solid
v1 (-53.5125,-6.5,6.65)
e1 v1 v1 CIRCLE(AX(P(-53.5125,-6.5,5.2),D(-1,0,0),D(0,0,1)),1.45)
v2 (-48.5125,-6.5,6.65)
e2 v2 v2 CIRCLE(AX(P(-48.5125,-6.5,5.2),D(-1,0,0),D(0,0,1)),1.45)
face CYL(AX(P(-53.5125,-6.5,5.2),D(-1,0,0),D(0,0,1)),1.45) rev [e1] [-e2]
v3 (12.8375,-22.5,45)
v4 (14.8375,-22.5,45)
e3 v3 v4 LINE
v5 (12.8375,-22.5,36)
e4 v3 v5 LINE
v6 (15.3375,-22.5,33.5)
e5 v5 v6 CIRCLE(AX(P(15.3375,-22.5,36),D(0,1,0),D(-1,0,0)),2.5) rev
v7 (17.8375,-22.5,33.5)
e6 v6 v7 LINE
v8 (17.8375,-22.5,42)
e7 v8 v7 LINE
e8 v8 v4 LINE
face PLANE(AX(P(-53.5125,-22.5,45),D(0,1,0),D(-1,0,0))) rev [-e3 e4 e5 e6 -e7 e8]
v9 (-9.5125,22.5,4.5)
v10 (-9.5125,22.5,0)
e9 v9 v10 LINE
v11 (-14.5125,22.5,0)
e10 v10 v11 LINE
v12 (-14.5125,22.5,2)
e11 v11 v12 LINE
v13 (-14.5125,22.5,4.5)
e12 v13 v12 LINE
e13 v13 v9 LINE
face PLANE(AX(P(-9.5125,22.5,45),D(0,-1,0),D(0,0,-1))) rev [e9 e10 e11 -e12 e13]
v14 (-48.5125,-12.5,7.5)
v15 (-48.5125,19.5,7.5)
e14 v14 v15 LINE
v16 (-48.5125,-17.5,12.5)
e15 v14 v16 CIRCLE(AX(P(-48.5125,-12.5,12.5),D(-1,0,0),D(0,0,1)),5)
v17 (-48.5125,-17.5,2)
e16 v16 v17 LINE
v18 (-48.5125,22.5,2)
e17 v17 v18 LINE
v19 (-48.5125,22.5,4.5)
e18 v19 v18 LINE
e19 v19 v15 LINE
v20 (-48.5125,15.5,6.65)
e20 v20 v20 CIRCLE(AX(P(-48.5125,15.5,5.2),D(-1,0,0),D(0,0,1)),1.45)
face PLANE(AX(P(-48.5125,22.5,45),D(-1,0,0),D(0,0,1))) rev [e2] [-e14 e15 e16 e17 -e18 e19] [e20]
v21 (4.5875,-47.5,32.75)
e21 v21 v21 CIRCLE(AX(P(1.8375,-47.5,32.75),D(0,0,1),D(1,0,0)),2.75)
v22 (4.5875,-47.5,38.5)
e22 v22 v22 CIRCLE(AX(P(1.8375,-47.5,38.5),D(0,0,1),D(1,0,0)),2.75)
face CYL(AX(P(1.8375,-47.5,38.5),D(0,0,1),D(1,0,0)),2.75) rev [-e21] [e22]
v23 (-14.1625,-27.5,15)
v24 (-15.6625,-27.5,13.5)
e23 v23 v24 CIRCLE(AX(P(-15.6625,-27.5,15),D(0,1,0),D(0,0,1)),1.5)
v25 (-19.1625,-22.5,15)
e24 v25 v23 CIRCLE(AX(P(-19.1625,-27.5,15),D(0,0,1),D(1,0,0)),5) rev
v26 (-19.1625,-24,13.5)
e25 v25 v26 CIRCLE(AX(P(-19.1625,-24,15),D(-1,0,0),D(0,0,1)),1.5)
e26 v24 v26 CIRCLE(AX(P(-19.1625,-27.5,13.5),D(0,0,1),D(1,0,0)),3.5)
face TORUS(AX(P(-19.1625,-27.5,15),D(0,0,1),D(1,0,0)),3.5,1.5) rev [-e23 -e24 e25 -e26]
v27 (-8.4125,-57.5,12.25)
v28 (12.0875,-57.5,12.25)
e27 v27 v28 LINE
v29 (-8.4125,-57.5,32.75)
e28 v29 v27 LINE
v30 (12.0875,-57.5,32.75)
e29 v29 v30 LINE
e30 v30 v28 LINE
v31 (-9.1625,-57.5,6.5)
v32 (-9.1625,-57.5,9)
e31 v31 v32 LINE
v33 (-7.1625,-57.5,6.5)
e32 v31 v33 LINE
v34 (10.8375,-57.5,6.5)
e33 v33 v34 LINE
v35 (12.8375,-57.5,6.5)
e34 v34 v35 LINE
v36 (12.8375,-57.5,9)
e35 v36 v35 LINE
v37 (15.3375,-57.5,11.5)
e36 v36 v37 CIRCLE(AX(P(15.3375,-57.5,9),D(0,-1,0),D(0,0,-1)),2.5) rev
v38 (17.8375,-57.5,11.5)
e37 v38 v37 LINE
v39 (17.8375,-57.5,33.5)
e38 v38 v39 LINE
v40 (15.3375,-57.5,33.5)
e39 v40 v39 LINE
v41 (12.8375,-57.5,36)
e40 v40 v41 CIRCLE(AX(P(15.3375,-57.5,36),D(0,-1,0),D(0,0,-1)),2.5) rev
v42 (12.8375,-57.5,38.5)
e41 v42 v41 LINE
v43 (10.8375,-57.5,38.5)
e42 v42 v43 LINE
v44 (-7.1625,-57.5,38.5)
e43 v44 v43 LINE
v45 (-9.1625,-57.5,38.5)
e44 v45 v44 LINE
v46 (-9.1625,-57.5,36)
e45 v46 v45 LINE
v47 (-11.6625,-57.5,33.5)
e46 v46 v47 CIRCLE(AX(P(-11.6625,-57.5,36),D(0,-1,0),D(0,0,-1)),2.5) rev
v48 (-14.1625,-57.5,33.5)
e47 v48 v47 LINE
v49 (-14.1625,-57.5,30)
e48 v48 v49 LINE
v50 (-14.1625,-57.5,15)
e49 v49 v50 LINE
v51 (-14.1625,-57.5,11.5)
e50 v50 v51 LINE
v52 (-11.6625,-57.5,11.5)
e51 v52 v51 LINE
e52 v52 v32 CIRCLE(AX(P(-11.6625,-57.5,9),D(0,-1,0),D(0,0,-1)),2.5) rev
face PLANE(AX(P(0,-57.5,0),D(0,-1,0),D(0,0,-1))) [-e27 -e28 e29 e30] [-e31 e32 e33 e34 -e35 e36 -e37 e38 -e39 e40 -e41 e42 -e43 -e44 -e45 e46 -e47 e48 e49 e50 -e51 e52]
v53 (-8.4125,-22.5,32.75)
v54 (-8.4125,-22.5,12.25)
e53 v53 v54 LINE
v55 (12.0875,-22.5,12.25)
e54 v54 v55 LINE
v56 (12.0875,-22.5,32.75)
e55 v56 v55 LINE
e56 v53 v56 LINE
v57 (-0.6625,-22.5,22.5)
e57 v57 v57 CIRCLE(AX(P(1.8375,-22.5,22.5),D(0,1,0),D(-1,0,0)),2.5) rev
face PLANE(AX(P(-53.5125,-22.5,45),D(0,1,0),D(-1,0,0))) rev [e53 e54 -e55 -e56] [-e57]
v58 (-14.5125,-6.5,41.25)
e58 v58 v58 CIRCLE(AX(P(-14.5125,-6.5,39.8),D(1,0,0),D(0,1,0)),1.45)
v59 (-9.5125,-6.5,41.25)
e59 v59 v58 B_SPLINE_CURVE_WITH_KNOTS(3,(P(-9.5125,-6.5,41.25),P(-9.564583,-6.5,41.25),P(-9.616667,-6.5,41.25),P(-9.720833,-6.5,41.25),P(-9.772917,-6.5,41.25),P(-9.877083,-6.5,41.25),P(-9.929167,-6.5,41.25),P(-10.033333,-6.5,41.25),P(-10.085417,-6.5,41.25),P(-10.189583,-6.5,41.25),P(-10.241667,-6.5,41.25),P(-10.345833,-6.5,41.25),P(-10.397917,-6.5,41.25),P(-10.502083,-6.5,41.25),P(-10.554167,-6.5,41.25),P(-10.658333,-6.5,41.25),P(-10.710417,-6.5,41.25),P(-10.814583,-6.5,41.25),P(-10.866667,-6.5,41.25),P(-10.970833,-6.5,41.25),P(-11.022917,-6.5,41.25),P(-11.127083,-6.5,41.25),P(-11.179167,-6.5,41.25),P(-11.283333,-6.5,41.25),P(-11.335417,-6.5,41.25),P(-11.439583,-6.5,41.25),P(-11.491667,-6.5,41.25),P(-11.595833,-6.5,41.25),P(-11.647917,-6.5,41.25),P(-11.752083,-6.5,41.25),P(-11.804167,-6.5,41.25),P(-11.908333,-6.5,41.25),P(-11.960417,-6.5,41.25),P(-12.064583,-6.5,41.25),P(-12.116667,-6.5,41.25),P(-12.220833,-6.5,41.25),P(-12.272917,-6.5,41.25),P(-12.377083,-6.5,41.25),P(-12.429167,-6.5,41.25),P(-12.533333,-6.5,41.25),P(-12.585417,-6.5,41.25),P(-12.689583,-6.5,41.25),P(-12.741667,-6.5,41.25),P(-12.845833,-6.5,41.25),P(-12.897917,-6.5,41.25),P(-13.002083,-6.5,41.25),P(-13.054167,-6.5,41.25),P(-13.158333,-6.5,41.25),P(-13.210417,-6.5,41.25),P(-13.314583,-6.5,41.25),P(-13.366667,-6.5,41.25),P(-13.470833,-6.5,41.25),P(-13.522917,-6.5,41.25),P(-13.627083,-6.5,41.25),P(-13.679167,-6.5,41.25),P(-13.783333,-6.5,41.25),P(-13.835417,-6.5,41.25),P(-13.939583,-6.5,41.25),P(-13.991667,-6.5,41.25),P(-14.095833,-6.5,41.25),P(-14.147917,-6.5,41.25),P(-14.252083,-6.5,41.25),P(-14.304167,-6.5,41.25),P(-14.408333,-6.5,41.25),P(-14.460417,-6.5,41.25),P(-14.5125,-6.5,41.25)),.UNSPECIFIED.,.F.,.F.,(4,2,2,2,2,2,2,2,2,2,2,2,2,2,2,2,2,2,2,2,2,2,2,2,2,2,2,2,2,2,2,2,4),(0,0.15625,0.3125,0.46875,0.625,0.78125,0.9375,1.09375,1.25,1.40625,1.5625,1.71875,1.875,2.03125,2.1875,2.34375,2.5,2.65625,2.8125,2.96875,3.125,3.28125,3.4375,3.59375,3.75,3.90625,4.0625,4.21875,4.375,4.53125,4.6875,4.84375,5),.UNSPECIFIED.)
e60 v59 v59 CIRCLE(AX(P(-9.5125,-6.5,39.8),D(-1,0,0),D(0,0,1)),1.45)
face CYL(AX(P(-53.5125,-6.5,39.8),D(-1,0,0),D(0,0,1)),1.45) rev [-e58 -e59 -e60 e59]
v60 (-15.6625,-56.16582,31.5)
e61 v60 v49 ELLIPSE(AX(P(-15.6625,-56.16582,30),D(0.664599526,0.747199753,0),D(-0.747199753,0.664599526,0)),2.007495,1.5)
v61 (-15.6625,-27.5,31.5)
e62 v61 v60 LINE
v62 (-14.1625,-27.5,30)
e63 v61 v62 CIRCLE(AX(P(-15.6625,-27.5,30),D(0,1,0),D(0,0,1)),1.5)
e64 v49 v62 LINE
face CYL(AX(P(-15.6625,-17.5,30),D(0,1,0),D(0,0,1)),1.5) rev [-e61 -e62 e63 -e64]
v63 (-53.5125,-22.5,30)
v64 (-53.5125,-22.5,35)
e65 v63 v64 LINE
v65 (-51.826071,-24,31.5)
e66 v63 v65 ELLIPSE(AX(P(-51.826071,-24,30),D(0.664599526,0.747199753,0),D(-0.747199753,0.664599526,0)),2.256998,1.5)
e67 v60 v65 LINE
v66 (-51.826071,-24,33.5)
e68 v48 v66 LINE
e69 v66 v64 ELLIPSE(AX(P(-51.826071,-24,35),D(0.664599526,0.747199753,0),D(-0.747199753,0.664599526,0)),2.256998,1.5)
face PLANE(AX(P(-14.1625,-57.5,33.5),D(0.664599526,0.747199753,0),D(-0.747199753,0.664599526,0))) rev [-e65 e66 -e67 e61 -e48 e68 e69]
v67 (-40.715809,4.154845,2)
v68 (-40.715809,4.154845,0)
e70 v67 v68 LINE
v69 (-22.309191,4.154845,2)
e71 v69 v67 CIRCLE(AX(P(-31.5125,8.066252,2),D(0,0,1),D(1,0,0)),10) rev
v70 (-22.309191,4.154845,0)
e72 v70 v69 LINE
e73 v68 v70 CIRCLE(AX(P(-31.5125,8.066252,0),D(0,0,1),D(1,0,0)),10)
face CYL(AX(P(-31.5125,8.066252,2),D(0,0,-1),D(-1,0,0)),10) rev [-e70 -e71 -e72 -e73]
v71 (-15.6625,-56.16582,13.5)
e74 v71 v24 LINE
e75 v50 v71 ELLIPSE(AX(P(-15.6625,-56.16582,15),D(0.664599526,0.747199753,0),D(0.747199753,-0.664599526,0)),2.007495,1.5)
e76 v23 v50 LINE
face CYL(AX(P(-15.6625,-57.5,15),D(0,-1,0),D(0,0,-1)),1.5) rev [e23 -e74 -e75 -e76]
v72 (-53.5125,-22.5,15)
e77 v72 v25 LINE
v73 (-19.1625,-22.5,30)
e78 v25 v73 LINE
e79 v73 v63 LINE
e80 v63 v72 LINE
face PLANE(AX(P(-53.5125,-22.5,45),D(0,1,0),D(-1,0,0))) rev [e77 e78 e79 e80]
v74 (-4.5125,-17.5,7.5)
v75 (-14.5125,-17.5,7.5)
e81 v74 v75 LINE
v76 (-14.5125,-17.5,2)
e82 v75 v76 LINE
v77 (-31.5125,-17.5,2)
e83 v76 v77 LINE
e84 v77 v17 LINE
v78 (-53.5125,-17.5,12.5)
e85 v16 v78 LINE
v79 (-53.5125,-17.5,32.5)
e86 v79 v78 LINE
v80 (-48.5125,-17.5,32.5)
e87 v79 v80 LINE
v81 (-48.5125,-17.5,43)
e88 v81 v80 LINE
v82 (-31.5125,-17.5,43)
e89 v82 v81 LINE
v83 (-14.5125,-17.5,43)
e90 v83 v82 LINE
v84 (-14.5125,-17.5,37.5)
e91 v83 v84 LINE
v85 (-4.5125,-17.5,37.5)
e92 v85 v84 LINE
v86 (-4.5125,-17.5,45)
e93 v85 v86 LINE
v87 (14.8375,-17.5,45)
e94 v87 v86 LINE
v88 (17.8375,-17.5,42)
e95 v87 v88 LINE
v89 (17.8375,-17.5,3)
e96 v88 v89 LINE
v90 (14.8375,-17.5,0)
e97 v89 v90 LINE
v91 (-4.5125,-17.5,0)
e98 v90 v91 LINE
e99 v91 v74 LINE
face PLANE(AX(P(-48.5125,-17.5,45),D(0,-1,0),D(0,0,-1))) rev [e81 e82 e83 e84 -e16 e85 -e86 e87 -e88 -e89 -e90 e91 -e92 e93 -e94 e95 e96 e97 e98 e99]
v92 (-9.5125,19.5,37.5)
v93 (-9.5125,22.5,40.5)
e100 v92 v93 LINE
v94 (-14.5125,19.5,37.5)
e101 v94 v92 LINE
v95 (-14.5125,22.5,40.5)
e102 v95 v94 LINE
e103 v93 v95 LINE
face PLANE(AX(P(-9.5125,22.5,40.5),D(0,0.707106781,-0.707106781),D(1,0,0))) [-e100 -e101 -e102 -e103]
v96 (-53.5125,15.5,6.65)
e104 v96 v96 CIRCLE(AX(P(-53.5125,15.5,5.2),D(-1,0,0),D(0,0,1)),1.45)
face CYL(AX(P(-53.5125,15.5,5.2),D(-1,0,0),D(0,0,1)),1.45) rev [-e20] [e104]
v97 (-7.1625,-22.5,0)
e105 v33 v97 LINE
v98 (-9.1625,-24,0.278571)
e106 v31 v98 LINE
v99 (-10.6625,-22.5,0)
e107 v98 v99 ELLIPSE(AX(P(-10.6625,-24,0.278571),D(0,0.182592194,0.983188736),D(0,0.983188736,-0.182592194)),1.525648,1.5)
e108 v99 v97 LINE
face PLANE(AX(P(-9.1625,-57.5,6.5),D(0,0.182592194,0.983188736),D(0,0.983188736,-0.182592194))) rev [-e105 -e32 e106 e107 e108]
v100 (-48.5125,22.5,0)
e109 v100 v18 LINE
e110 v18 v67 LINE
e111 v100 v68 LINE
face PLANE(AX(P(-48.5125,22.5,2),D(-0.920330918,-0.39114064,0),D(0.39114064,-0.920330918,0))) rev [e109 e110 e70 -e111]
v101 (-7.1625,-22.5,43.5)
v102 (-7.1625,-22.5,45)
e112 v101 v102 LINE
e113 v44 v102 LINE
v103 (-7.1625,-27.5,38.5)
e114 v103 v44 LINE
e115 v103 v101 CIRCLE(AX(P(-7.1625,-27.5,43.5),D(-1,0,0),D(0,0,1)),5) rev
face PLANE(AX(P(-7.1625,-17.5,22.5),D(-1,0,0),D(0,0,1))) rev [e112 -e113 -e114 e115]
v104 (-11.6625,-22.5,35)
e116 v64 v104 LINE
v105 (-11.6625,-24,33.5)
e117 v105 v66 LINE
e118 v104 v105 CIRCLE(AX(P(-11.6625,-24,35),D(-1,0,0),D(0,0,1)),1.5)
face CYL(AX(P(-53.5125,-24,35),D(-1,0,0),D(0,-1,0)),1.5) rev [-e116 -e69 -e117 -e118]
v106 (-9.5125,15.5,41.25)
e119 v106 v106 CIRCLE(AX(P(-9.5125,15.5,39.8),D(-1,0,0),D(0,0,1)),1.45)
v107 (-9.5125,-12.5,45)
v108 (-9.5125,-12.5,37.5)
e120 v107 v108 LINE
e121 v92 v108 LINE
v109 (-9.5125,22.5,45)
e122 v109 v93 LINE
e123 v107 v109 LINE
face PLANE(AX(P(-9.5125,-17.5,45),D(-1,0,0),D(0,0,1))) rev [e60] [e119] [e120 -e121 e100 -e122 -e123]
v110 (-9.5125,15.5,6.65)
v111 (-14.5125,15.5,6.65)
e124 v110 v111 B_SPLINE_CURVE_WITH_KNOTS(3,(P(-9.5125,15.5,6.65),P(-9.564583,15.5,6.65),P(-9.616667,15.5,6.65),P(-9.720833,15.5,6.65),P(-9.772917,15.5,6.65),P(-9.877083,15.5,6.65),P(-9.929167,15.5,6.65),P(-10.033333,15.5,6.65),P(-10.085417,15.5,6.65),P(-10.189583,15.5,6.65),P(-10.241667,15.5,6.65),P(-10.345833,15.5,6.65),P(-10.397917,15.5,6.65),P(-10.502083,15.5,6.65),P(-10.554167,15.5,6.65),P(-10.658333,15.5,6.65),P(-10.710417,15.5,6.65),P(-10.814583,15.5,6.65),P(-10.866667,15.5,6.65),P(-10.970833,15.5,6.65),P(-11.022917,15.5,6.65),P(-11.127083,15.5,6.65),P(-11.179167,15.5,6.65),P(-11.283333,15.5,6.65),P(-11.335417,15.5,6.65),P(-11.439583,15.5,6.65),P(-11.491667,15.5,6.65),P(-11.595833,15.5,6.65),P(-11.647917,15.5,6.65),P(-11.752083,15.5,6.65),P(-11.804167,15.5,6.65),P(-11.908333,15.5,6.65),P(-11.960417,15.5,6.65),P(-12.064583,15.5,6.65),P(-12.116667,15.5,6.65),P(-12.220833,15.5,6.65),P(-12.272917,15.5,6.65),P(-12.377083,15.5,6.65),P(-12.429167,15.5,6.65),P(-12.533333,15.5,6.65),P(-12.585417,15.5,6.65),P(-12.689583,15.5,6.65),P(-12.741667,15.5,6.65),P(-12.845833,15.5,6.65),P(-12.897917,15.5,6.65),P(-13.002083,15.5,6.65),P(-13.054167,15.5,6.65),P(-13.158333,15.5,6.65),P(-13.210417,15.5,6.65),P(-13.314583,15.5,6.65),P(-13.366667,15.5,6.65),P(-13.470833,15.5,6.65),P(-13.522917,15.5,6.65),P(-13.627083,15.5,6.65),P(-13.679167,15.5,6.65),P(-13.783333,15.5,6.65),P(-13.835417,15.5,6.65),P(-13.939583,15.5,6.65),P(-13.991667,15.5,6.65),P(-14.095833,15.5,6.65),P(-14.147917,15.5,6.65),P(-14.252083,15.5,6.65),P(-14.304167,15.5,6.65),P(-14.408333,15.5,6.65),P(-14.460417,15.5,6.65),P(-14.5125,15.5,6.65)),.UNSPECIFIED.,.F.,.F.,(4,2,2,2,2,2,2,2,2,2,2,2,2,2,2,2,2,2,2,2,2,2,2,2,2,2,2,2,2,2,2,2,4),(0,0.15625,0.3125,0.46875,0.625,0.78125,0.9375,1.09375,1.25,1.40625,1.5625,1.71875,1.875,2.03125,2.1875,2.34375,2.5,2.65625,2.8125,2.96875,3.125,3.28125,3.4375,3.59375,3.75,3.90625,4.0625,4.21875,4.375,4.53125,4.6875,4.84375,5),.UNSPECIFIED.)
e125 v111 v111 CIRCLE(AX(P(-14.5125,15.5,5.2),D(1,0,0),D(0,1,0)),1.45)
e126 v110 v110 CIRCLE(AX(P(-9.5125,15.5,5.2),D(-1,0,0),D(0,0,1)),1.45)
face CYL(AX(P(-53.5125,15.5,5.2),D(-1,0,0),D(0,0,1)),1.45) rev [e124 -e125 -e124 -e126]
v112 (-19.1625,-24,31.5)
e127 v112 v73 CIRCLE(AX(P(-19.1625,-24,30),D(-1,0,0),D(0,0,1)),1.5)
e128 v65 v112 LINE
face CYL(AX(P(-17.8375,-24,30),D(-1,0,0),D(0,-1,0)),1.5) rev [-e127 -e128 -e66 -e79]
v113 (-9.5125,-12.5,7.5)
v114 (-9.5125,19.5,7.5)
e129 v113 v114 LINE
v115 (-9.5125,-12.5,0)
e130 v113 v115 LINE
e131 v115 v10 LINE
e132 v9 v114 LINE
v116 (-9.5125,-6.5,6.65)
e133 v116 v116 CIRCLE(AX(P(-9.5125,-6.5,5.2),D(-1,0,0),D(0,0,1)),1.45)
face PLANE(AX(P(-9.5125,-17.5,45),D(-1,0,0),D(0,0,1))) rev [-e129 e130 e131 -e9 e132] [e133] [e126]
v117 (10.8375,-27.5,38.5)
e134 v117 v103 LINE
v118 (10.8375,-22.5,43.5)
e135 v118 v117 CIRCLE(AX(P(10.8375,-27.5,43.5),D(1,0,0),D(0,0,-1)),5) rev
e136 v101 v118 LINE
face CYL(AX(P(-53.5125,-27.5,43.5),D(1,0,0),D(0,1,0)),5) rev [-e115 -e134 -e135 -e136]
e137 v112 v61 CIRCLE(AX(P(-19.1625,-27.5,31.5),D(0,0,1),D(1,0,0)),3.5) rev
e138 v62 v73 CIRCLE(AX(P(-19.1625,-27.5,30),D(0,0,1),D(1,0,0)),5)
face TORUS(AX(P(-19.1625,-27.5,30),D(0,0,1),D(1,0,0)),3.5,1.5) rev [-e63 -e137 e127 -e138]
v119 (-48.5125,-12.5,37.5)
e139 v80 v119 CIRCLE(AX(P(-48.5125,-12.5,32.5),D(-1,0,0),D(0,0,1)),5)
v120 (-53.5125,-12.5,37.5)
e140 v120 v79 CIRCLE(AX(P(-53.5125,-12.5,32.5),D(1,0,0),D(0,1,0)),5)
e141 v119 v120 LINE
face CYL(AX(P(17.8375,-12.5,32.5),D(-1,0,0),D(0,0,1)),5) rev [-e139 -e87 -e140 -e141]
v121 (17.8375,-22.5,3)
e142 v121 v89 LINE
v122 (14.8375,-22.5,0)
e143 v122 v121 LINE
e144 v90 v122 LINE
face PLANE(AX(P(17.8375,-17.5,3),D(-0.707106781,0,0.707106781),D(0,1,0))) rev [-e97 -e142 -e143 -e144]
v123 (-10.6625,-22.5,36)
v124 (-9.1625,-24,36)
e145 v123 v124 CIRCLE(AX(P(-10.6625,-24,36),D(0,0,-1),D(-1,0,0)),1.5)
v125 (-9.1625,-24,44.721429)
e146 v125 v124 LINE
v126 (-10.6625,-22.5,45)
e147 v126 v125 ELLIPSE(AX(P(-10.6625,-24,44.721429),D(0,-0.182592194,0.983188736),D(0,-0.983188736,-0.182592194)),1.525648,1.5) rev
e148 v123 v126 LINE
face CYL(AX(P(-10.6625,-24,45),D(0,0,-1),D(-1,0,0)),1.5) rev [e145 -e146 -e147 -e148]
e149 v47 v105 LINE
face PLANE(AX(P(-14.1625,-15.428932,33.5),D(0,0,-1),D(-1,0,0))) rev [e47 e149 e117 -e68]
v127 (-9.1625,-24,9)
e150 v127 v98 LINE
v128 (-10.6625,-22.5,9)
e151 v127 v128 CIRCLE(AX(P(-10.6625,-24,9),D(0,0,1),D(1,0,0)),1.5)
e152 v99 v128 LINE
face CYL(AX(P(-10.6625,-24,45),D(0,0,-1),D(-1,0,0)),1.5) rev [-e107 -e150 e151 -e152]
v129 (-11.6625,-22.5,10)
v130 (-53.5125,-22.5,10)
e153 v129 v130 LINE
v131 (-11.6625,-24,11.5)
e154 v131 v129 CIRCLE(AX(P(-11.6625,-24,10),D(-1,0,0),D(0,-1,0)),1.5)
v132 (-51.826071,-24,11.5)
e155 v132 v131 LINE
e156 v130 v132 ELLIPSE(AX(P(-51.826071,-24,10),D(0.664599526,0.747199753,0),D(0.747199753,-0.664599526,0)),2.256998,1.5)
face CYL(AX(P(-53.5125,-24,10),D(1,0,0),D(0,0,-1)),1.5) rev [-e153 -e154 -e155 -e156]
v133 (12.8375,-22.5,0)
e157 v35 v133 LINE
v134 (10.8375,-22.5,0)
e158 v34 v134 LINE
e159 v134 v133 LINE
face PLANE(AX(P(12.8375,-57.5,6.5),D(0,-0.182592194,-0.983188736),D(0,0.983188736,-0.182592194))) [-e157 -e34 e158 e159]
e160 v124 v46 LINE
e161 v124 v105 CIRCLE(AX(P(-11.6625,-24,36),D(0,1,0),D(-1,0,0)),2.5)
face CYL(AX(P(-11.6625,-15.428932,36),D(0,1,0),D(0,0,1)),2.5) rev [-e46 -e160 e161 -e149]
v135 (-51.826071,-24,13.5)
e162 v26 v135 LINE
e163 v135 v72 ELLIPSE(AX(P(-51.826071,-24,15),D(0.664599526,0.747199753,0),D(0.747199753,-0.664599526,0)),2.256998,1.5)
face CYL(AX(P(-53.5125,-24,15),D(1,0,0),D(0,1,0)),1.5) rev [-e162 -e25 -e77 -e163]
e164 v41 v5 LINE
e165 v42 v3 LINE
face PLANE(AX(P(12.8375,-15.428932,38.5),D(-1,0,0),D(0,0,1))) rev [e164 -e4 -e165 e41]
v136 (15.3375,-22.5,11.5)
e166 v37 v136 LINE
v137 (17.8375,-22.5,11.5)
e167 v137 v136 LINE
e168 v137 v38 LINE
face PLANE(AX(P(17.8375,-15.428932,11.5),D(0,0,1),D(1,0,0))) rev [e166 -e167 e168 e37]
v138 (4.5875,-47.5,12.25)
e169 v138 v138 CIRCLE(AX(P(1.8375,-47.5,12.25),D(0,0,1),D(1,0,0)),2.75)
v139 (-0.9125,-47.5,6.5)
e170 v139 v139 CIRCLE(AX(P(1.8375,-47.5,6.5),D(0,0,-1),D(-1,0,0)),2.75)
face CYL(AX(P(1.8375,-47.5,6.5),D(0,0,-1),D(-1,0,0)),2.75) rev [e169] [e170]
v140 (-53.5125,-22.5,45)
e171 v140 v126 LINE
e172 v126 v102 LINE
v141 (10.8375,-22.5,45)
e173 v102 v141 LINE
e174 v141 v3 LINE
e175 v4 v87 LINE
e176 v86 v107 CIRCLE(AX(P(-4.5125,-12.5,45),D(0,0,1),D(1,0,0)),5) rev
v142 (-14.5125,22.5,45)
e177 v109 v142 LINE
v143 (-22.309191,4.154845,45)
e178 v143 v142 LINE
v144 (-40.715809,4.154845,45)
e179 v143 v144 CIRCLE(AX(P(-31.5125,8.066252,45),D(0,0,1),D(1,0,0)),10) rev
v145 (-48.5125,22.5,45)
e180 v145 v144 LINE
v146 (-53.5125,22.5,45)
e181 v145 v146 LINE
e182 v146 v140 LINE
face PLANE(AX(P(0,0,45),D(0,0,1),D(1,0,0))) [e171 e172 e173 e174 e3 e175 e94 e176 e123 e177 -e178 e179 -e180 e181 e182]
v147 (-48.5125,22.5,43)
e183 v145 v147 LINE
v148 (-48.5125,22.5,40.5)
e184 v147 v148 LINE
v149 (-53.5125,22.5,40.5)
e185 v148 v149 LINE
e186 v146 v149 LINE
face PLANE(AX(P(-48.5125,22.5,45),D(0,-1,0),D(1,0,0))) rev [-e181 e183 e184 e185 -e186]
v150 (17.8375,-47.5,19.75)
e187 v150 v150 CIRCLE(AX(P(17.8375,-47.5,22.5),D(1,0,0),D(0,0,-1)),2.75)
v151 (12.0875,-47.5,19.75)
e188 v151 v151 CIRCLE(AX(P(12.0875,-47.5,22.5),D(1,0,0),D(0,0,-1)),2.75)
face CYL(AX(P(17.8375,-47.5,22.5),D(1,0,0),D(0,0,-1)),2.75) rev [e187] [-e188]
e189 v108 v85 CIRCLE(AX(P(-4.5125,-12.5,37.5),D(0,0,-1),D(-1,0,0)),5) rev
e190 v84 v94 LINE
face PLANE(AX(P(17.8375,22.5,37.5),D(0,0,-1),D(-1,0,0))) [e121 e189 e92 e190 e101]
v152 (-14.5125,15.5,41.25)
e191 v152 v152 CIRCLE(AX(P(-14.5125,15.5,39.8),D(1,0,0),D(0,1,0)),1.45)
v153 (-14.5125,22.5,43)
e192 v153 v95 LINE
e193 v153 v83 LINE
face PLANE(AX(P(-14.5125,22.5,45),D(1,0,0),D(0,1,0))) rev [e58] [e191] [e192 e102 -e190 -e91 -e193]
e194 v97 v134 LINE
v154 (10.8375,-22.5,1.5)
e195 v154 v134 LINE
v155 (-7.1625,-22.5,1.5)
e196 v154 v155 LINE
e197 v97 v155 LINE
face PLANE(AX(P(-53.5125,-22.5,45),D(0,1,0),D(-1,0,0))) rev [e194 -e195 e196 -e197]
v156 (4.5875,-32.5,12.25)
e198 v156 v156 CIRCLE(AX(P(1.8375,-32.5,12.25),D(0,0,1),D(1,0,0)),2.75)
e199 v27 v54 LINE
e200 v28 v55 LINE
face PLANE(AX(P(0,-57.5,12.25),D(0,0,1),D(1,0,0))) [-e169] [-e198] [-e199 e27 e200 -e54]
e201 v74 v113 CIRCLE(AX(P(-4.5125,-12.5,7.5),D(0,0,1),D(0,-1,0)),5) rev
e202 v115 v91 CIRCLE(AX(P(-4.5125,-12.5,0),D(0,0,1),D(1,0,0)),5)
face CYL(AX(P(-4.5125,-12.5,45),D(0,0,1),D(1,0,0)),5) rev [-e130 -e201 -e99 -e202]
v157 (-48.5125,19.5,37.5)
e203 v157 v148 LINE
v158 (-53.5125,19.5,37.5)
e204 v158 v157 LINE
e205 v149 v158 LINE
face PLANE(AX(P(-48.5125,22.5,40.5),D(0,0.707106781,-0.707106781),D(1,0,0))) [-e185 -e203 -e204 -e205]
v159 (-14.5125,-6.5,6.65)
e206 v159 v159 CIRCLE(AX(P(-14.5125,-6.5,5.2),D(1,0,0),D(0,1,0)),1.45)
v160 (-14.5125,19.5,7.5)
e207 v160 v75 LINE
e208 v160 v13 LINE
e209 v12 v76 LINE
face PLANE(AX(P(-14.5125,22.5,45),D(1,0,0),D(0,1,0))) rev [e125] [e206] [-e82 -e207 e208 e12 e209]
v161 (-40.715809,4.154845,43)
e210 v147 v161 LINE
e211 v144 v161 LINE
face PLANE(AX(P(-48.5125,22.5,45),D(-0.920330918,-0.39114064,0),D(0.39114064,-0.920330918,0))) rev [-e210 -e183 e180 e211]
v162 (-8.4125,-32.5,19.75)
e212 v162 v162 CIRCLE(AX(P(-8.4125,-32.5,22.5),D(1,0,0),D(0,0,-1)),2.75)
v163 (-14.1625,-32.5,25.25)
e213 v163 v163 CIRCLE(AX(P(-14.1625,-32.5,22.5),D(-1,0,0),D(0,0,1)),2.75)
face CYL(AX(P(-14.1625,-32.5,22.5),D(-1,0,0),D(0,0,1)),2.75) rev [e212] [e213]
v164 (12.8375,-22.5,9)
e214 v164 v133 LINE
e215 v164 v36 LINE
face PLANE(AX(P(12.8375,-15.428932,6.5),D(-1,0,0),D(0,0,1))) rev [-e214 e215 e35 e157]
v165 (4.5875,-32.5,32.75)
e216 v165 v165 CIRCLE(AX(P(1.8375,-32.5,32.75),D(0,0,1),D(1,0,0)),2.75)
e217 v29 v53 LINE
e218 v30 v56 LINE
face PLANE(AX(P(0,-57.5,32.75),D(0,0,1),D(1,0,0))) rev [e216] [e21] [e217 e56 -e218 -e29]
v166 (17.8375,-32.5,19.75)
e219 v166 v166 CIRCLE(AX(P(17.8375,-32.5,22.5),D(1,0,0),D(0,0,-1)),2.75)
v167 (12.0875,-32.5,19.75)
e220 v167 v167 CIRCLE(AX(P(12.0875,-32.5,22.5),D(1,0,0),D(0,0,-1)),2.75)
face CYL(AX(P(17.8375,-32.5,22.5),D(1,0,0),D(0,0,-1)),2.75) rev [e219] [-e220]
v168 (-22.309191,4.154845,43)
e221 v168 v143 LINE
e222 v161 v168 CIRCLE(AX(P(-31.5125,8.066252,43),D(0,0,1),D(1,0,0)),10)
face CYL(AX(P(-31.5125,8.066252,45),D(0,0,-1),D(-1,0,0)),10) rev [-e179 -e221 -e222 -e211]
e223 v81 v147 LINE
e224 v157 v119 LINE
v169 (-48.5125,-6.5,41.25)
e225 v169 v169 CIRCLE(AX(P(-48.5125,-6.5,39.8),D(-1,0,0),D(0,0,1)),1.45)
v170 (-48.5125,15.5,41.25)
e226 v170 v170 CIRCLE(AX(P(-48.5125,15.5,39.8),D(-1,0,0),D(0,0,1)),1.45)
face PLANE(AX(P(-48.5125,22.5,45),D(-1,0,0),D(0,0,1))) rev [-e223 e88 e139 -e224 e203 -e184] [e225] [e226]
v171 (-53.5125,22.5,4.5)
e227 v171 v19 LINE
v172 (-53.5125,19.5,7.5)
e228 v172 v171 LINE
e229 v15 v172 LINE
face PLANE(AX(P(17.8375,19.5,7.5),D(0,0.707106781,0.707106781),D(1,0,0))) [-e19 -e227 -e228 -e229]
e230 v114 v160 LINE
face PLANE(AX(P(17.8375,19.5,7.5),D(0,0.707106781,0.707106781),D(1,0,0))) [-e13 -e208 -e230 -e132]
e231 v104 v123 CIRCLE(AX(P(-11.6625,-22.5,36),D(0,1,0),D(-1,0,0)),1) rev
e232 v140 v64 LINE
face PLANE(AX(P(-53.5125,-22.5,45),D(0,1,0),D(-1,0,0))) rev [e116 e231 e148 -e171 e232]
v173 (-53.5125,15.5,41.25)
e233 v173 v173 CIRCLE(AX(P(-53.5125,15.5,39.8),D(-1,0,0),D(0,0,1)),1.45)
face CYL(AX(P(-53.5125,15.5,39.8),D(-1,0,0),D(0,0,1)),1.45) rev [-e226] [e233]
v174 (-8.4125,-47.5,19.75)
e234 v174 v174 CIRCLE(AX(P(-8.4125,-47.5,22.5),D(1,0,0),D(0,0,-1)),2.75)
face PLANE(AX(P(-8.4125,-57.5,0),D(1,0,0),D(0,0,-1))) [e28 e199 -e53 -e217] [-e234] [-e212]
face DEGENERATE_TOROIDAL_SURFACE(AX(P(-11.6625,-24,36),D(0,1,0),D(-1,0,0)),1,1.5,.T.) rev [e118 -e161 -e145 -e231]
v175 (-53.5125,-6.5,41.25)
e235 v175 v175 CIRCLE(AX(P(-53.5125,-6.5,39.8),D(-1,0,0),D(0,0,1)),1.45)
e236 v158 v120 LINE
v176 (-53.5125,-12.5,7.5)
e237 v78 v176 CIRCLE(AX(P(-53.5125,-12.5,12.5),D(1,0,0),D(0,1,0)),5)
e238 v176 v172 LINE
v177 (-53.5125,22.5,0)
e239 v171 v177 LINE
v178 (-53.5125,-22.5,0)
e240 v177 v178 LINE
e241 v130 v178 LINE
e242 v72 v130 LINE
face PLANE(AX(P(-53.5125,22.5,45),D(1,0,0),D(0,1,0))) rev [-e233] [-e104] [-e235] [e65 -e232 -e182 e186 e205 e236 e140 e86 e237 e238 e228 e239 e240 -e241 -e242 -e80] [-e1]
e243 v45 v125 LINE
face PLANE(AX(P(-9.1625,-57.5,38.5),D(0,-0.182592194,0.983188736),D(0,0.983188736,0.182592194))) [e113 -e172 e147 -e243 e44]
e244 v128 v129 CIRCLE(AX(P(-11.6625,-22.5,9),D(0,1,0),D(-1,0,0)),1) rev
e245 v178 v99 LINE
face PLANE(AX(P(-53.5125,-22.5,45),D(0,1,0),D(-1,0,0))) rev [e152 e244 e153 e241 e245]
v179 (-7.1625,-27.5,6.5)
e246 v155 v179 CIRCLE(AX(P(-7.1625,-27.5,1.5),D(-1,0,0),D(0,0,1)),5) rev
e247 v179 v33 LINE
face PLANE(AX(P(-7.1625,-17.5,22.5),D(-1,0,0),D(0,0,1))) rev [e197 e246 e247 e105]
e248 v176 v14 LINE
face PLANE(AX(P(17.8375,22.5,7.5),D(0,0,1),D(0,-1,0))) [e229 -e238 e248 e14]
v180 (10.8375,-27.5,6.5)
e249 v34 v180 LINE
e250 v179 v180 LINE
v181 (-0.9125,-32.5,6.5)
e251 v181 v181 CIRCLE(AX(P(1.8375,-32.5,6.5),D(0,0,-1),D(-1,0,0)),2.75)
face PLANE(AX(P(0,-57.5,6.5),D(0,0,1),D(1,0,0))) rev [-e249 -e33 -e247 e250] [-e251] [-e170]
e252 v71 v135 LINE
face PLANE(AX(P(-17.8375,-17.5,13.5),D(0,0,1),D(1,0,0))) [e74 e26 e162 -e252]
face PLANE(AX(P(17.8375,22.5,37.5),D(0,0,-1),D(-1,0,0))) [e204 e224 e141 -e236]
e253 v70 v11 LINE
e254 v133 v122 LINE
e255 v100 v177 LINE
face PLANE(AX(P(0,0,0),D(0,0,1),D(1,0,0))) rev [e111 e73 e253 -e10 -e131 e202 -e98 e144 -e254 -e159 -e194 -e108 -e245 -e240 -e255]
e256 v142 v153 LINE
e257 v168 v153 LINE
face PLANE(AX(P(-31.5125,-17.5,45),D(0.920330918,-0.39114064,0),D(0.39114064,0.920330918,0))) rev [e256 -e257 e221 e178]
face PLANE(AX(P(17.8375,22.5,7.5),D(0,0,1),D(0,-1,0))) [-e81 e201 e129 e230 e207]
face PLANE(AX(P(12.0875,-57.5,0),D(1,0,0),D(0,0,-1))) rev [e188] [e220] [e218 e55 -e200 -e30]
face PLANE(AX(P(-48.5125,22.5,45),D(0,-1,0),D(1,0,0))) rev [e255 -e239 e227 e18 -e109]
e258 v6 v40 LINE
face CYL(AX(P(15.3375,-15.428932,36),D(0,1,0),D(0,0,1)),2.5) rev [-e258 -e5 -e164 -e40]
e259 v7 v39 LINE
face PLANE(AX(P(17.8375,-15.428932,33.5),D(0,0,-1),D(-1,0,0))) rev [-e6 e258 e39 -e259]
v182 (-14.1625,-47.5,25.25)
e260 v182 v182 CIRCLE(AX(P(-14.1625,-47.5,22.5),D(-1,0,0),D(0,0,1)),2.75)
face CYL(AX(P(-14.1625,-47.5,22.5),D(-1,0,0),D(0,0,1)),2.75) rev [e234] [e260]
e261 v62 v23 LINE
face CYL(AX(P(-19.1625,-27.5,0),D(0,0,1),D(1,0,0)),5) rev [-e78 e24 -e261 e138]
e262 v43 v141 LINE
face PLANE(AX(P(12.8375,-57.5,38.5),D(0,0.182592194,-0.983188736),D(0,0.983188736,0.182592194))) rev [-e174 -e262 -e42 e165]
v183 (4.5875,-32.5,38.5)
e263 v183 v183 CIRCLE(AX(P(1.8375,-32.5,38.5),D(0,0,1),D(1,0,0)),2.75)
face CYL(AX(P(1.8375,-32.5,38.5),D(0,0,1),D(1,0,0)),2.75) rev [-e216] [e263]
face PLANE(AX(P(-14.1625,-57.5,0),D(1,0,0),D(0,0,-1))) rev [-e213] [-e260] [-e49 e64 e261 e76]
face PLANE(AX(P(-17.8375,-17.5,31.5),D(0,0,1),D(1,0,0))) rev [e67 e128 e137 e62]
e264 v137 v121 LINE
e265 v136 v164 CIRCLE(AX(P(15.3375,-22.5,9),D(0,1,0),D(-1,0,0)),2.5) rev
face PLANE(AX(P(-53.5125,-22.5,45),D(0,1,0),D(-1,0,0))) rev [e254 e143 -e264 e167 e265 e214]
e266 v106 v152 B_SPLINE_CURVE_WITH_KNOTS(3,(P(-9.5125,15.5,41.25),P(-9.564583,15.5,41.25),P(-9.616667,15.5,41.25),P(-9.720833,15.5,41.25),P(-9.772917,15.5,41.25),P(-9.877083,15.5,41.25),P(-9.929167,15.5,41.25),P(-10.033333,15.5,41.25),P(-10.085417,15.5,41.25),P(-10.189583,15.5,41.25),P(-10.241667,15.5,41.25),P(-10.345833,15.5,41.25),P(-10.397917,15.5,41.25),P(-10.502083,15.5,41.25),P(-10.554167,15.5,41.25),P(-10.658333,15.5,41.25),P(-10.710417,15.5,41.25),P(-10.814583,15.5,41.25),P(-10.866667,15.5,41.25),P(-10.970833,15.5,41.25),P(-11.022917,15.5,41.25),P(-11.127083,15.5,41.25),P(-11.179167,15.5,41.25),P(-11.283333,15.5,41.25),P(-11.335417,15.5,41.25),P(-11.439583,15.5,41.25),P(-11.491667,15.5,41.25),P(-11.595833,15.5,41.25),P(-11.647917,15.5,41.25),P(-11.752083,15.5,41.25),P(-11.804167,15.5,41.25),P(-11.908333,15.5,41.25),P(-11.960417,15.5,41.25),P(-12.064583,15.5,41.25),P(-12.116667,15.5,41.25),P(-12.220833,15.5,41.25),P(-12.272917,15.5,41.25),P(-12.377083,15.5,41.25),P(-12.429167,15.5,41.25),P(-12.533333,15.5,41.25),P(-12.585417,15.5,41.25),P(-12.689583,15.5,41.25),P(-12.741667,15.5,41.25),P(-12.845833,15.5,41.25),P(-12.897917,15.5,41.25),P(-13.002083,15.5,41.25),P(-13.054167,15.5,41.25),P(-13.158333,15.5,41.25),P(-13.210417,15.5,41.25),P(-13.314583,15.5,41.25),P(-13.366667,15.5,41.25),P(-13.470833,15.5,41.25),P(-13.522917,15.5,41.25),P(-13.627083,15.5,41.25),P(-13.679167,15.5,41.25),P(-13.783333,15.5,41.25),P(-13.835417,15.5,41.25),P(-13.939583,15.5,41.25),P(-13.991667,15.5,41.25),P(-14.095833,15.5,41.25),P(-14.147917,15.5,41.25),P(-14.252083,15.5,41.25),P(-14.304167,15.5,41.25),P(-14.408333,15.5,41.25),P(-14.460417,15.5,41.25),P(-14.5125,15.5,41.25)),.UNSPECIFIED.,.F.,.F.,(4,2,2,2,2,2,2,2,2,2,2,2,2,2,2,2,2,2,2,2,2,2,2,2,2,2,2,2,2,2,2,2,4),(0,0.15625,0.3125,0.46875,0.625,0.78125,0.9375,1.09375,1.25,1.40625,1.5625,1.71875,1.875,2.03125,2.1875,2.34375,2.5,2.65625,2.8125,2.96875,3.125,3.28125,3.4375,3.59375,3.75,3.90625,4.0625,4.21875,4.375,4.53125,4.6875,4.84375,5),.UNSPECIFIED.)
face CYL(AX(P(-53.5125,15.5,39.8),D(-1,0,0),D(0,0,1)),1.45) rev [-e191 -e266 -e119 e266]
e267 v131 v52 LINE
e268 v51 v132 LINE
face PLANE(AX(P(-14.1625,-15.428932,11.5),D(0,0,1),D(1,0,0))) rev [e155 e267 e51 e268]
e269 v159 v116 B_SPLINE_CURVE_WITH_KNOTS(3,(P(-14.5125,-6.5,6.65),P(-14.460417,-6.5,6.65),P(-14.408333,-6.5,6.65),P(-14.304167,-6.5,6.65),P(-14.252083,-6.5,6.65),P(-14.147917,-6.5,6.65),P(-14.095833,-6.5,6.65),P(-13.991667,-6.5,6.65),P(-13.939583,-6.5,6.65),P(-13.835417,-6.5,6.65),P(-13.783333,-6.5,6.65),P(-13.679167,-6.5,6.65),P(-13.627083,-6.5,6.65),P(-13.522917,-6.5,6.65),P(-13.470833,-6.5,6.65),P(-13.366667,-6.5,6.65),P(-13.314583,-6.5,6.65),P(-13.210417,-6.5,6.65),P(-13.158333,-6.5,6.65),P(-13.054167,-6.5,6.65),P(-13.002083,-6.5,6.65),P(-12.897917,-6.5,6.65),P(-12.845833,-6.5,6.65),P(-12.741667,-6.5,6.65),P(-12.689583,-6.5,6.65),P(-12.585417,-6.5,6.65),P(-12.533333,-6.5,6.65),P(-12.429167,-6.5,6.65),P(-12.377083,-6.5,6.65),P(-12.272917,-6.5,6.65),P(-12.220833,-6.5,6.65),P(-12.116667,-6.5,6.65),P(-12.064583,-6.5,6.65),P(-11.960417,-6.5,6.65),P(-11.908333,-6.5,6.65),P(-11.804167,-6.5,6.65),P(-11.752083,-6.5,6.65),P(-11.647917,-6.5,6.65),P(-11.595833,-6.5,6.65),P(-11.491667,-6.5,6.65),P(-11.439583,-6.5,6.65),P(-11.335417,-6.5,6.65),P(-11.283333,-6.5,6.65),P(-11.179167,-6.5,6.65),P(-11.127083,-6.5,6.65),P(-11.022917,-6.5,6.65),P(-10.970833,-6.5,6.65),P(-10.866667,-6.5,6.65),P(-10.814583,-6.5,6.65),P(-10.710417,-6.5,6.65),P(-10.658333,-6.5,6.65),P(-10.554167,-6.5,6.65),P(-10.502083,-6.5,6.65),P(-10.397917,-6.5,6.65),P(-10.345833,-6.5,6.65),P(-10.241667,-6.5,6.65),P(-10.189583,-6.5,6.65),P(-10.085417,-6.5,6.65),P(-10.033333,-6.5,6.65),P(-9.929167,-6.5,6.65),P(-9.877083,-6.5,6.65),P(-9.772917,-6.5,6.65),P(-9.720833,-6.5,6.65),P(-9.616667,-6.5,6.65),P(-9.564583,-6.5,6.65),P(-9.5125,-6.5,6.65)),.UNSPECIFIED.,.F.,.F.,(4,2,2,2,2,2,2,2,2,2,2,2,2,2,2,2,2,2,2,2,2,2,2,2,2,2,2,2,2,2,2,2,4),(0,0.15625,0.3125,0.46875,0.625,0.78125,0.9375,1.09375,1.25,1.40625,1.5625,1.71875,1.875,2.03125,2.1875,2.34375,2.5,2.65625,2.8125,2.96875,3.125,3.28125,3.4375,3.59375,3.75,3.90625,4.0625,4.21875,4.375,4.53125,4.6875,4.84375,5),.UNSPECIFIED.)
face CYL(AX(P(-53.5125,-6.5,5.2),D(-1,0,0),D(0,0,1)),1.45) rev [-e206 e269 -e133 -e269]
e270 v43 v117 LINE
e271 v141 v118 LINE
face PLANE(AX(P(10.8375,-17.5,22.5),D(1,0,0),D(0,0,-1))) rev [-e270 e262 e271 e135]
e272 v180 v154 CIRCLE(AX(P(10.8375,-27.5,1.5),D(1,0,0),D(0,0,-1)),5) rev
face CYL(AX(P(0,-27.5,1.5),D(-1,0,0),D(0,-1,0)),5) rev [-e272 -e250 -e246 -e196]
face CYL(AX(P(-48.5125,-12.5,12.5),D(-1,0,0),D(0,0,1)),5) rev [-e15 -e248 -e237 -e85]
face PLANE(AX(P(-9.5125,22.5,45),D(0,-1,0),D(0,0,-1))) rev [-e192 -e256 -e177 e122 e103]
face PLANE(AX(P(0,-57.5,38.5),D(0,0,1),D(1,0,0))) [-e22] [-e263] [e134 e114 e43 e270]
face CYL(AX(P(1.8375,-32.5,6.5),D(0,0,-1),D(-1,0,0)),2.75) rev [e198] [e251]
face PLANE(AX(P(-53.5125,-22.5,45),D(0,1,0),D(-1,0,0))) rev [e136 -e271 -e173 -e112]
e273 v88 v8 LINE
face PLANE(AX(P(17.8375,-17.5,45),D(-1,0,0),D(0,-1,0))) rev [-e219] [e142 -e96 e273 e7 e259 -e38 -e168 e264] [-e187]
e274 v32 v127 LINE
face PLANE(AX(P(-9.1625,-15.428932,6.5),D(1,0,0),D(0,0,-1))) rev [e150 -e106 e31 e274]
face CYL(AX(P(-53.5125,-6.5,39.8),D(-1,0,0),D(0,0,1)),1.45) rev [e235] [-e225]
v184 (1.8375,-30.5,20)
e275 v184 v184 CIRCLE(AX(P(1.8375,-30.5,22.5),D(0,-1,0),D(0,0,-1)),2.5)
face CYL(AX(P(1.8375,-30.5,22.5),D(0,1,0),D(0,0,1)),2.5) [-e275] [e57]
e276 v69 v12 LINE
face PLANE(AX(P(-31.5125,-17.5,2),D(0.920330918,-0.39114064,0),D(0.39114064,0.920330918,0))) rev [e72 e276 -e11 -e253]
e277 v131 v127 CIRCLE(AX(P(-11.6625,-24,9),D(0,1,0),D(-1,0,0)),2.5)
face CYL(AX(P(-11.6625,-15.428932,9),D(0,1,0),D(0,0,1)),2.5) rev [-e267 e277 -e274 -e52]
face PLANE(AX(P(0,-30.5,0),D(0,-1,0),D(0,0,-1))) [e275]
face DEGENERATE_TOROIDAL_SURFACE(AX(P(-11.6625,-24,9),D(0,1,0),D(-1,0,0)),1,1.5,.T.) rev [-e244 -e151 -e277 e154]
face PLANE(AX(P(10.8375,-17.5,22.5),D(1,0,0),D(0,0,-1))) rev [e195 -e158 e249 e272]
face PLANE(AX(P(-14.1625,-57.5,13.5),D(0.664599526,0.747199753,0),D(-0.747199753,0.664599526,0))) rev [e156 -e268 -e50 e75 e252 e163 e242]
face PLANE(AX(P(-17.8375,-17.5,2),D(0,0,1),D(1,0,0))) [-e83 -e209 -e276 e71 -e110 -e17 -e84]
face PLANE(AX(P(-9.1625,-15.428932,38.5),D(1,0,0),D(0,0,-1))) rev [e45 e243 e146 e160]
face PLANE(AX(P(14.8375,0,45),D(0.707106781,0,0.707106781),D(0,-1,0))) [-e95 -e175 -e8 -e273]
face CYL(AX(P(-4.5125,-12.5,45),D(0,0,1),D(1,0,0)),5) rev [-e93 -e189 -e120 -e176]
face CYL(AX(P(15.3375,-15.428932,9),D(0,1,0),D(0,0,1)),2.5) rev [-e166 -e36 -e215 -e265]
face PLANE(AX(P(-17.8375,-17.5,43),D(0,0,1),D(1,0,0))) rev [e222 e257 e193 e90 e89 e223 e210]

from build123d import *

# Parameters (mm, degrees)
BOSS_EXTRUDE1_DEPTH           = 45
SKETCH3_W                     = 30
SKETCH3_H                     = 40
CUT_EXTRUDE1_DEPTH            = 88.304481557
SKETCH4_W                     = 32
SKETCH4_H                     = 32
SKETCH4_W_2                   = 20.5
SKETCH4_H_2                   = 20.5
BOSS_EXTRUDE2_DEPTH           = 35
SKETCH6_W                     = 5
SKETCH6_H                     = 5
CUT_EXTRUDE4_DEPTH            = 35
RIB1_REACH                    = 87.394
SKETCH9_WALL_W                = 225.450736488
SKETCH9_WALL_H                = 2
LPATTERN1_COUNT               = 2
LPATTERN1_PITCH               = 20
RIB6_REACH                    = 100.659
SKETCH14_WALL_W               = 234.916193708
SKETCH14_WALL_H               = 2
RIB7_START                    = -2
RIB7_DEPTH                    = 2
FILLET2_R                     = 5
FILLET3_R                     = 5
RIB10_REACH                   = 92.525
SKETCH17_WALL_W               = 226.513312862
SKETCH17_WALL_H               = 2
RIB11_REACH                   = 92.525
SKETCH18_WALL_W               = 226.513312862
SKETCH18_WALL_H               = 2
FILLET4_R                     = 10
LPATTERN2_COUNT               = 2
LPATTERN2_PITCH               = 43
FILLET4_OF_LPATTERN2_R        = 10
M5_CLEARANCE_HOLE2_AT_2_COUNT = 2
M5_CLEARANCE_HOLE2_AT_2_PITCH = 15
M2_5_CLEARANCE_HOLE1_D        = 2.9
FILLET5_R                     = 2.5
SKETCH4_4_R                   = 2.5
BOSS_EXTRUDE4_DEPTH           = 8
CIRPATTERN1_COUNT             = 4
CHAMFER1_SIZE                 = 3
FILLET6_R                     = 5
FILLET7_R                     = 1.5


# Read off the part's stored shape, not the designer's step: Rib7
with BuildPart() as part:
    # Sketch2 → Boss-Extrude1 (new body)
    with BuildSketch(Plane.XY):
        Polygon((-53.5125, -22.5), (17.8375, -22.5), (17.8375, -17.5), (-9.5125, -17.5), (-9.5125, 22.5), (-14.5125, 22.5), (-14.5125, -17.5), (-48.5125, -17.5), (-48.5125, 22.5), (-53.5125, 22.5), align=None)
    extrude(amount=BOSS_EXTRUDE1_DEPTH)

    # Sketch3 → Cut-Extrude1 (cut, through all)
    with BuildSketch(Plane(origin=(-53.5125, 0, 0), x_dir=(0, 0, -1), z_dir=(1, 0, 0))):
        with Locations((-22.5, 2.5)):
            Rectangle(SKETCH3_W, SKETCH3_H)
    extrude(amount=CUT_EXTRUDE1_DEPTH, mode=Mode.SUBTRACT)

    # Sketch4 → Boss-Extrude2 (add)
    with BuildSketch(Plane.XZ.offset(22.5)):
        with Locations((1.8375, 22.5)):
            Rectangle(SKETCH4_W, SKETCH4_H)
        with Locations((1.8375, 22.5)):
            Rectangle(SKETCH4_W_2, SKETCH4_H_2, mode=Mode.SUBTRACT)
    extrude(amount=BOSS_EXTRUDE2_DEPTH)

    # Sketch6 → Cut-Extrude4 (cut)
    with BuildSketch(Plane(origin=(0, -57.5, 0), x_dir=(-1, 0, 0), z_dir=(0, -1, 0))):
        with Locations((11.6625, -36)):
            Rectangle(SKETCH6_W, SKETCH6_H)
        with Locations((-15.3375, -36)):
            Rectangle(SKETCH6_W, SKETCH6_H)
        with Locations((-15.3375, -9)):
            Rectangle(SKETCH6_W, SKETCH6_H)
        with Locations((11.6625, -9)):
            Rectangle(SKETCH6_W, SKETCH6_H)
    extrude(amount=-CUT_EXTRUDE4_DEPTH, mode=Mode.SUBTRACT)

    # Sketch9 wall → Rib1 (add, up to next)
    with BuildSketch(Plane(origin=(-33.8375, -40, 33.5), x_dir=(-0.747199752598, 0.664599525818, 0), z_dir=(-0.664599525818, -0.747199752598, 0)), mode=Mode.PRIVATE) as rib1_sk1:
        with Locations((0, 1)):
            Rectangle(SKETCH9_WALL_W, SKETCH9_WALL_H)
    rib1_tool1 = extrude(rib1_sk1.sketch, amount=-RIB1_REACH, mode=Mode.PRIVATE) - part.part
    rib1 = rib1_tool1.solids().sort_by_distance((-33.8375, -40, 33.5))[0]
    add(rib1)

    # LPattern1: Rib1 ×2
    with Locations(*[(0, 0, -i * LPATTERN1_PITCH) for i in range(1, LPATTERN1_COUNT)]):
        add(rib1)

    # Sketch14 wall → Rib6 (add, up to next)
    with BuildSketch(Plane(origin=(12.8375, -40, 3.25), x_dir=(0, 0.983188736076, -0.182592193843), z_dir=(0, 0.182592193843, 0.983188736076)), mode=Mode.PRIVATE) as rib6_sk1:
        with Locations((0, 1)):
            Rectangle(SKETCH14_WALL_W, SKETCH14_WALL_H)
    rib6_tool1 = extrude(rib6_sk1.sketch, amount=RIB6_REACH, mode=Mode.PRIVATE) - part.part
    rib6 = rib6_tool1.solids().sort_by_distance((12.8375, -40, 3.25))[0]
    add(rib6)

    # Rib7 outline → Rib7 (add)
    with BuildSketch(Plane.ZY.offset(9.1625).offset(RIB7_START)):
        Polygon((0, -22.5), (6.5, -57.5), (6.5, -22.5), align=None)
    rib7 = extrude(amount=RIB7_DEPTH)

    # Fillet2
    fillet2_edges = [part.edges().sort_by_distance(p)[0] for p in [
        (1.8375, -22.5, 38.5),
        (-14.1625, -22.5, 22.5),
        (1.8375, -22.5, 6.5),
    ]]
    fillet(fillet2_edges, radius=FILLET2_R)

    # Fillet3
    fillet3_edges = [part.edges().sort_by_distance(p)[0] for p in [
        (-9.5125, -17.5, 41.25),
        (-9.5125, -17.5, 3.75),
    ]]
    fillet(fillet3_edges, radius=FILLET3_R)

    # Sketch17 wall → Rib10 (add, up to next)
    with BuildSketch(Plane(origin=(-40.0125, 2.5, 45), x_dir=(0.391140640345, -0.920330918458, 0), z_dir=(0.920330918458, 0.391140640345, 0)), mode=Mode.PRIVATE) as rib10_sk1:
        with Locations((0, 1)):
            Rectangle(SKETCH17_WALL_W, SKETCH17_WALL_H)
    rib10_tool1 = extrude(rib10_sk1.sketch, amount=-RIB10_REACH, mode=Mode.PRIVATE) - part.part
    rib10 = rib10_tool1.solids().sort_by_distance((-40.0125, 2.5, 45))[0]
    add(rib10)

    # Sketch18 wall → Rib11 (add, up to next)
    with BuildSketch(Plane(origin=(-23.0125, 2.5, 45), x_dir=(0.391140640345, 0.920330918458, 0), z_dir=(-0.920330918458, 0.391140640345, 0)), mode=Mode.PRIVATE) as rib11_sk1:
        with Locations((0, 1)):
            Rectangle(SKETCH18_WALL_W, SKETCH18_WALL_H)
    rib11_tool1 = extrude(rib11_sk1.sketch, amount=-RIB11_REACH, mode=Mode.PRIVATE) - part.part
    rib11 = rib11_tool1.solids().sort_by_distance((-23.0125, 2.5, 45))[0]
    add(rib11)

    # Fillet4
    # the kernel refuses this fillet: 10 mm, written as the material it adds along each edge
    with BuildSketch(Plane(origin=(-31.5125, -17.5, 45), x_dir=(-0.391140640345148, 0.9203309184583486, 0), z_dir=(0, 0, -1))) as fillet4_piece_1:
        with BuildLine():
            CenterArc((FILLET4_R * 2.35294117647, FILLET4_R), FILLET4_R, 136.050984017, 133.949015983)
            Line((FILLET4_R * 1.63298352692, FILLET4_R * 1.69401799894), (0, 0))
            Line((0, 0), (FILLET4_R * 2.35294117647, 0))
        make_face()
    extrude(amount=2)

    # LPattern2: Rib10, Rib11 ×2
    with Locations(*[(0, 0, -i * LPATTERN2_PITCH) for i in range(1, LPATTERN2_COUNT)]):
        add(rib10)
        add(rib11)

    # Fillet4 of LPattern2
    # the kernel refuses this fillet: 10 mm, written as the material it adds along each edge
    with BuildSketch(Plane(origin=(-31.5125, -17.5, 60.823529412), x_dir=(-0.39114064034514817, 0.9203309184583486, 0), z_dir=(0, 0, -1))) as fillet4_of_lpattern2_piece_1_section:
        with BuildLine():
            CenterArc((FILLET4_OF_LPATTERN2_R * 2.35294117647, FILLET4_OF_LPATTERN2_R), FILLET4_OF_LPATTERN2_R, 136.050984017, 133.949015983)
            Line((FILLET4_OF_LPATTERN2_R * 1.63298352692, FILLET4_OF_LPATTERN2_R * 1.69401799894), (0, 0))
            Line((0, 0), (FILLET4_OF_LPATTERN2_R * 2.35294117647, 0))
        make_face()
    fillet4_of_lpattern2_piece_1 = extrude(amount=60.823529412, mode=Mode.PRIVATE)
    fillet4_of_lpattern2_piece_1 = split(fillet4_of_lpattern2_piece_1, bisect_by=Plane(origin=(-31.5125, -6.311496297, 43), z_dir=(0, 0, 1)), keep=Keep.TOP, mode=Mode.PRIVATE)
    fillet4_of_lpattern2_piece_1 = split(fillet4_of_lpattern2_piece_1, bisect_by=Plane(origin=(-31.5125, -6.311496297, 45), z_dir=(0, 0, -1)), keep=Keep.TOP, mode=Mode.PRIVATE)
    add(fillet4_of_lpattern2_piece_1)
    with BuildSketch(Plane(origin=(-31.5125, -17.5, 2), x_dir=(-0.391140640345148, 0.9203309184583486, 0), z_dir=(0, 0, -1))) as fillet4_of_lpattern2_piece_2:
        with BuildLine():
            CenterArc((FILLET4_OF_LPATTERN2_R * 2.35294117647, FILLET4_OF_LPATTERN2_R), FILLET4_OF_LPATTERN2_R, 136.050984017, 133.949015983)
            Line((FILLET4_OF_LPATTERN2_R * 1.63298352692, FILLET4_OF_LPATTERN2_R * 1.69401799894), (0, 0))
            Line((0, 0), (FILLET4_OF_LPATTERN2_R * 2.35294117647, 0))
        make_face()
    extrude(amount=2)

    # Sketch22 → M5 Clearance Hole2 (revolve, cut)
    with BuildSketch(Plane(origin=(1.8375, -32.5, 38.5), x_dir=(0, -1, 0), z_dir=(1, 0, 0))):
        Polygon((0, 0), (0, 7.652366702), (2.75, 6), (2.75, 0), align=None)
    m5_clearance_hole2 = revolve(axis=Axis((1.8375, -32.5, 44.85), (0, 0, -1)), mode=Mode.SUBTRACT)

    # M5 Clearance Hole2 at 2: M5 Clearance Hole2 ×2
    with Locations(*[(0, -i * M5_CLEARANCE_HOLE2_AT_2_PITCH, 0) for i in range(1, M5_CLEARANCE_HOLE2_AT_2_COUNT)]):
        add(m5_clearance_hole2, mode=Mode.SUBTRACT)

    # M2.5 Clearance Hole1 (through all)
    with Locations(Plane.ZY.offset(53.5125)):
        with Locations((5.2, 15.5), (39.8, 15.5), (39.8, -6.5), (5.2, -6.5)):
            Hole(M2_5_CLEARANCE_HOLE1_D / 2)

    # Fillet5
    fillet5_edges = [part.edges().sort_by_distance(p)[0] for p in [
        (-9.1625, -40, 11.5),
        (12.8375, -40, 11.5),
        (12.8375, -40, 33.5),
        (-9.1625, -40, 33.5),
    ]]
    fillet(fillet5_edges, radius=FILLET5_R)

    # Sketch4<4> → Boss-Extrude4 (add)
    with BuildSketch(Plane.XZ.offset(22.5)):
        with Locations(Location((1.8375, 22.5, 0), (0, 0, 180))):
            Circle(SKETCH4_4_R)
    extrude(amount=BOSS_EXTRUDE4_DEPTH)

    # CirPattern1: M5 Clearance Hole2 ×4 about axis
    cirpattern1_axis = Axis((1.8375, -30.5, 22.5), (0, -1, 0))
    for i in range(1, CIRPATTERN1_COUNT):
        add(m5_clearance_hole2.rotate(cirpattern1_axis, i * 360 / CIRPATTERN1_COUNT), mode=Mode.SUBTRACT)

    # CirPattern1 copy 1 sketch → CirPattern1 copy 1 (revolve, cut)
    with BuildSketch(Plane(origin=(-14.1625, -47.5, 22.5), x_dir=(0, -1, 0), z_dir=(0, 0, 1))):
        Polygon((0, 0), (0, 7.652366702), (2.75, 6), (2.75, 0), align=None)
    revolve(axis=Axis((-20.5125, -47.5, 22.5), (1, 0, 0)), mode=Mode.SUBTRACT)

    # CirPattern1 copy 2 sketch → CirPattern1 copy 2 (revolve, cut)
    with BuildSketch(Plane(origin=(1.8375, -47.5, 6.5), x_dir=(0, -1, 0), z_dir=(-1, 0, 0))):
        Polygon((0, 0), (0, 7.652366702), (2.75, 6), (2.75, 0), align=None)
    revolve(axis=Axis((1.8375, -47.5, 0.15), (0, 0, 1)), mode=Mode.SUBTRACT)

    # CirPattern1 copy 3 sketch → CirPattern1 copy 3 (revolve, cut)
    with BuildSketch(Plane(origin=(17.8375, -47.5, 22.5), x_dir=(0, -1, 0), z_dir=(0, 0, -1))):
        Polygon((0, 0), (0, 7.652366702), (2.75, 6), (2.75, 0), align=None)
    revolve(axis=Axis((24.1875, -47.5, 22.5), (-1, 0, 0)), mode=Mode.SUBTRACT)

    # Mirror1: Rib6, Rib7 across plane
    add(rib6.mirror(Plane.XY.offset(22.5)))
    add(rib7.mirror(Plane.XY.offset(22.5)))

    # Chamfer1
    chamfer1_edges = [part.edges().sort_by_distance(p)[0] for p in [
        (17.8375, -20, 0),
        (-12.0125, 22.5, 37.5),
        (-51.0125, 22.5, 37.5),
        (-12.0125, 22.5, 7.5),
        (-51.0125, 22.5, 7.5),
        (17.8375, -20, 45),
    ]]
    chamfer(chamfer1_edges, length=CHAMFER1_SIZE)

    # Fillet6
    fillet6_edges = [part.edges().sort_by_distance(p)[0] for p in [
        (-51.0125, -17.5, 37.5),
        (-51.0125, -17.5, 7.5),
    ]]
    fillet(fillet6_edges, radius=FILLET6_R)

    # Fillet7
    fillet7_edges = [part.edges().sort_by_distance(p)[0] for p in [
        (-9.1625, -22.5, 4.5),
        (-32.5875, -22.5, 33.5),
        (-36.3375, -22.5, 31.5),
        (-36.3375, -22.5, 13.5),
        (-14.1625, -42.5, 13.5),
        (-14.1625, -42.5, 31.5),
        (-15.626966094, -23.964466094, 13.5),
        (-15.626966094, -23.964466094, 31.5),
        (-32.5875, -22.5, 11.5),
        (-9.894733047, -22.5, 10.767766953),
        (-9.1625, -22.5, 40.5),
        (-9.894733047, -22.5, 34.232233047),
    ]]
    fillet(fillet7_edges, radius=FILLET7_R)


solid = part.part
